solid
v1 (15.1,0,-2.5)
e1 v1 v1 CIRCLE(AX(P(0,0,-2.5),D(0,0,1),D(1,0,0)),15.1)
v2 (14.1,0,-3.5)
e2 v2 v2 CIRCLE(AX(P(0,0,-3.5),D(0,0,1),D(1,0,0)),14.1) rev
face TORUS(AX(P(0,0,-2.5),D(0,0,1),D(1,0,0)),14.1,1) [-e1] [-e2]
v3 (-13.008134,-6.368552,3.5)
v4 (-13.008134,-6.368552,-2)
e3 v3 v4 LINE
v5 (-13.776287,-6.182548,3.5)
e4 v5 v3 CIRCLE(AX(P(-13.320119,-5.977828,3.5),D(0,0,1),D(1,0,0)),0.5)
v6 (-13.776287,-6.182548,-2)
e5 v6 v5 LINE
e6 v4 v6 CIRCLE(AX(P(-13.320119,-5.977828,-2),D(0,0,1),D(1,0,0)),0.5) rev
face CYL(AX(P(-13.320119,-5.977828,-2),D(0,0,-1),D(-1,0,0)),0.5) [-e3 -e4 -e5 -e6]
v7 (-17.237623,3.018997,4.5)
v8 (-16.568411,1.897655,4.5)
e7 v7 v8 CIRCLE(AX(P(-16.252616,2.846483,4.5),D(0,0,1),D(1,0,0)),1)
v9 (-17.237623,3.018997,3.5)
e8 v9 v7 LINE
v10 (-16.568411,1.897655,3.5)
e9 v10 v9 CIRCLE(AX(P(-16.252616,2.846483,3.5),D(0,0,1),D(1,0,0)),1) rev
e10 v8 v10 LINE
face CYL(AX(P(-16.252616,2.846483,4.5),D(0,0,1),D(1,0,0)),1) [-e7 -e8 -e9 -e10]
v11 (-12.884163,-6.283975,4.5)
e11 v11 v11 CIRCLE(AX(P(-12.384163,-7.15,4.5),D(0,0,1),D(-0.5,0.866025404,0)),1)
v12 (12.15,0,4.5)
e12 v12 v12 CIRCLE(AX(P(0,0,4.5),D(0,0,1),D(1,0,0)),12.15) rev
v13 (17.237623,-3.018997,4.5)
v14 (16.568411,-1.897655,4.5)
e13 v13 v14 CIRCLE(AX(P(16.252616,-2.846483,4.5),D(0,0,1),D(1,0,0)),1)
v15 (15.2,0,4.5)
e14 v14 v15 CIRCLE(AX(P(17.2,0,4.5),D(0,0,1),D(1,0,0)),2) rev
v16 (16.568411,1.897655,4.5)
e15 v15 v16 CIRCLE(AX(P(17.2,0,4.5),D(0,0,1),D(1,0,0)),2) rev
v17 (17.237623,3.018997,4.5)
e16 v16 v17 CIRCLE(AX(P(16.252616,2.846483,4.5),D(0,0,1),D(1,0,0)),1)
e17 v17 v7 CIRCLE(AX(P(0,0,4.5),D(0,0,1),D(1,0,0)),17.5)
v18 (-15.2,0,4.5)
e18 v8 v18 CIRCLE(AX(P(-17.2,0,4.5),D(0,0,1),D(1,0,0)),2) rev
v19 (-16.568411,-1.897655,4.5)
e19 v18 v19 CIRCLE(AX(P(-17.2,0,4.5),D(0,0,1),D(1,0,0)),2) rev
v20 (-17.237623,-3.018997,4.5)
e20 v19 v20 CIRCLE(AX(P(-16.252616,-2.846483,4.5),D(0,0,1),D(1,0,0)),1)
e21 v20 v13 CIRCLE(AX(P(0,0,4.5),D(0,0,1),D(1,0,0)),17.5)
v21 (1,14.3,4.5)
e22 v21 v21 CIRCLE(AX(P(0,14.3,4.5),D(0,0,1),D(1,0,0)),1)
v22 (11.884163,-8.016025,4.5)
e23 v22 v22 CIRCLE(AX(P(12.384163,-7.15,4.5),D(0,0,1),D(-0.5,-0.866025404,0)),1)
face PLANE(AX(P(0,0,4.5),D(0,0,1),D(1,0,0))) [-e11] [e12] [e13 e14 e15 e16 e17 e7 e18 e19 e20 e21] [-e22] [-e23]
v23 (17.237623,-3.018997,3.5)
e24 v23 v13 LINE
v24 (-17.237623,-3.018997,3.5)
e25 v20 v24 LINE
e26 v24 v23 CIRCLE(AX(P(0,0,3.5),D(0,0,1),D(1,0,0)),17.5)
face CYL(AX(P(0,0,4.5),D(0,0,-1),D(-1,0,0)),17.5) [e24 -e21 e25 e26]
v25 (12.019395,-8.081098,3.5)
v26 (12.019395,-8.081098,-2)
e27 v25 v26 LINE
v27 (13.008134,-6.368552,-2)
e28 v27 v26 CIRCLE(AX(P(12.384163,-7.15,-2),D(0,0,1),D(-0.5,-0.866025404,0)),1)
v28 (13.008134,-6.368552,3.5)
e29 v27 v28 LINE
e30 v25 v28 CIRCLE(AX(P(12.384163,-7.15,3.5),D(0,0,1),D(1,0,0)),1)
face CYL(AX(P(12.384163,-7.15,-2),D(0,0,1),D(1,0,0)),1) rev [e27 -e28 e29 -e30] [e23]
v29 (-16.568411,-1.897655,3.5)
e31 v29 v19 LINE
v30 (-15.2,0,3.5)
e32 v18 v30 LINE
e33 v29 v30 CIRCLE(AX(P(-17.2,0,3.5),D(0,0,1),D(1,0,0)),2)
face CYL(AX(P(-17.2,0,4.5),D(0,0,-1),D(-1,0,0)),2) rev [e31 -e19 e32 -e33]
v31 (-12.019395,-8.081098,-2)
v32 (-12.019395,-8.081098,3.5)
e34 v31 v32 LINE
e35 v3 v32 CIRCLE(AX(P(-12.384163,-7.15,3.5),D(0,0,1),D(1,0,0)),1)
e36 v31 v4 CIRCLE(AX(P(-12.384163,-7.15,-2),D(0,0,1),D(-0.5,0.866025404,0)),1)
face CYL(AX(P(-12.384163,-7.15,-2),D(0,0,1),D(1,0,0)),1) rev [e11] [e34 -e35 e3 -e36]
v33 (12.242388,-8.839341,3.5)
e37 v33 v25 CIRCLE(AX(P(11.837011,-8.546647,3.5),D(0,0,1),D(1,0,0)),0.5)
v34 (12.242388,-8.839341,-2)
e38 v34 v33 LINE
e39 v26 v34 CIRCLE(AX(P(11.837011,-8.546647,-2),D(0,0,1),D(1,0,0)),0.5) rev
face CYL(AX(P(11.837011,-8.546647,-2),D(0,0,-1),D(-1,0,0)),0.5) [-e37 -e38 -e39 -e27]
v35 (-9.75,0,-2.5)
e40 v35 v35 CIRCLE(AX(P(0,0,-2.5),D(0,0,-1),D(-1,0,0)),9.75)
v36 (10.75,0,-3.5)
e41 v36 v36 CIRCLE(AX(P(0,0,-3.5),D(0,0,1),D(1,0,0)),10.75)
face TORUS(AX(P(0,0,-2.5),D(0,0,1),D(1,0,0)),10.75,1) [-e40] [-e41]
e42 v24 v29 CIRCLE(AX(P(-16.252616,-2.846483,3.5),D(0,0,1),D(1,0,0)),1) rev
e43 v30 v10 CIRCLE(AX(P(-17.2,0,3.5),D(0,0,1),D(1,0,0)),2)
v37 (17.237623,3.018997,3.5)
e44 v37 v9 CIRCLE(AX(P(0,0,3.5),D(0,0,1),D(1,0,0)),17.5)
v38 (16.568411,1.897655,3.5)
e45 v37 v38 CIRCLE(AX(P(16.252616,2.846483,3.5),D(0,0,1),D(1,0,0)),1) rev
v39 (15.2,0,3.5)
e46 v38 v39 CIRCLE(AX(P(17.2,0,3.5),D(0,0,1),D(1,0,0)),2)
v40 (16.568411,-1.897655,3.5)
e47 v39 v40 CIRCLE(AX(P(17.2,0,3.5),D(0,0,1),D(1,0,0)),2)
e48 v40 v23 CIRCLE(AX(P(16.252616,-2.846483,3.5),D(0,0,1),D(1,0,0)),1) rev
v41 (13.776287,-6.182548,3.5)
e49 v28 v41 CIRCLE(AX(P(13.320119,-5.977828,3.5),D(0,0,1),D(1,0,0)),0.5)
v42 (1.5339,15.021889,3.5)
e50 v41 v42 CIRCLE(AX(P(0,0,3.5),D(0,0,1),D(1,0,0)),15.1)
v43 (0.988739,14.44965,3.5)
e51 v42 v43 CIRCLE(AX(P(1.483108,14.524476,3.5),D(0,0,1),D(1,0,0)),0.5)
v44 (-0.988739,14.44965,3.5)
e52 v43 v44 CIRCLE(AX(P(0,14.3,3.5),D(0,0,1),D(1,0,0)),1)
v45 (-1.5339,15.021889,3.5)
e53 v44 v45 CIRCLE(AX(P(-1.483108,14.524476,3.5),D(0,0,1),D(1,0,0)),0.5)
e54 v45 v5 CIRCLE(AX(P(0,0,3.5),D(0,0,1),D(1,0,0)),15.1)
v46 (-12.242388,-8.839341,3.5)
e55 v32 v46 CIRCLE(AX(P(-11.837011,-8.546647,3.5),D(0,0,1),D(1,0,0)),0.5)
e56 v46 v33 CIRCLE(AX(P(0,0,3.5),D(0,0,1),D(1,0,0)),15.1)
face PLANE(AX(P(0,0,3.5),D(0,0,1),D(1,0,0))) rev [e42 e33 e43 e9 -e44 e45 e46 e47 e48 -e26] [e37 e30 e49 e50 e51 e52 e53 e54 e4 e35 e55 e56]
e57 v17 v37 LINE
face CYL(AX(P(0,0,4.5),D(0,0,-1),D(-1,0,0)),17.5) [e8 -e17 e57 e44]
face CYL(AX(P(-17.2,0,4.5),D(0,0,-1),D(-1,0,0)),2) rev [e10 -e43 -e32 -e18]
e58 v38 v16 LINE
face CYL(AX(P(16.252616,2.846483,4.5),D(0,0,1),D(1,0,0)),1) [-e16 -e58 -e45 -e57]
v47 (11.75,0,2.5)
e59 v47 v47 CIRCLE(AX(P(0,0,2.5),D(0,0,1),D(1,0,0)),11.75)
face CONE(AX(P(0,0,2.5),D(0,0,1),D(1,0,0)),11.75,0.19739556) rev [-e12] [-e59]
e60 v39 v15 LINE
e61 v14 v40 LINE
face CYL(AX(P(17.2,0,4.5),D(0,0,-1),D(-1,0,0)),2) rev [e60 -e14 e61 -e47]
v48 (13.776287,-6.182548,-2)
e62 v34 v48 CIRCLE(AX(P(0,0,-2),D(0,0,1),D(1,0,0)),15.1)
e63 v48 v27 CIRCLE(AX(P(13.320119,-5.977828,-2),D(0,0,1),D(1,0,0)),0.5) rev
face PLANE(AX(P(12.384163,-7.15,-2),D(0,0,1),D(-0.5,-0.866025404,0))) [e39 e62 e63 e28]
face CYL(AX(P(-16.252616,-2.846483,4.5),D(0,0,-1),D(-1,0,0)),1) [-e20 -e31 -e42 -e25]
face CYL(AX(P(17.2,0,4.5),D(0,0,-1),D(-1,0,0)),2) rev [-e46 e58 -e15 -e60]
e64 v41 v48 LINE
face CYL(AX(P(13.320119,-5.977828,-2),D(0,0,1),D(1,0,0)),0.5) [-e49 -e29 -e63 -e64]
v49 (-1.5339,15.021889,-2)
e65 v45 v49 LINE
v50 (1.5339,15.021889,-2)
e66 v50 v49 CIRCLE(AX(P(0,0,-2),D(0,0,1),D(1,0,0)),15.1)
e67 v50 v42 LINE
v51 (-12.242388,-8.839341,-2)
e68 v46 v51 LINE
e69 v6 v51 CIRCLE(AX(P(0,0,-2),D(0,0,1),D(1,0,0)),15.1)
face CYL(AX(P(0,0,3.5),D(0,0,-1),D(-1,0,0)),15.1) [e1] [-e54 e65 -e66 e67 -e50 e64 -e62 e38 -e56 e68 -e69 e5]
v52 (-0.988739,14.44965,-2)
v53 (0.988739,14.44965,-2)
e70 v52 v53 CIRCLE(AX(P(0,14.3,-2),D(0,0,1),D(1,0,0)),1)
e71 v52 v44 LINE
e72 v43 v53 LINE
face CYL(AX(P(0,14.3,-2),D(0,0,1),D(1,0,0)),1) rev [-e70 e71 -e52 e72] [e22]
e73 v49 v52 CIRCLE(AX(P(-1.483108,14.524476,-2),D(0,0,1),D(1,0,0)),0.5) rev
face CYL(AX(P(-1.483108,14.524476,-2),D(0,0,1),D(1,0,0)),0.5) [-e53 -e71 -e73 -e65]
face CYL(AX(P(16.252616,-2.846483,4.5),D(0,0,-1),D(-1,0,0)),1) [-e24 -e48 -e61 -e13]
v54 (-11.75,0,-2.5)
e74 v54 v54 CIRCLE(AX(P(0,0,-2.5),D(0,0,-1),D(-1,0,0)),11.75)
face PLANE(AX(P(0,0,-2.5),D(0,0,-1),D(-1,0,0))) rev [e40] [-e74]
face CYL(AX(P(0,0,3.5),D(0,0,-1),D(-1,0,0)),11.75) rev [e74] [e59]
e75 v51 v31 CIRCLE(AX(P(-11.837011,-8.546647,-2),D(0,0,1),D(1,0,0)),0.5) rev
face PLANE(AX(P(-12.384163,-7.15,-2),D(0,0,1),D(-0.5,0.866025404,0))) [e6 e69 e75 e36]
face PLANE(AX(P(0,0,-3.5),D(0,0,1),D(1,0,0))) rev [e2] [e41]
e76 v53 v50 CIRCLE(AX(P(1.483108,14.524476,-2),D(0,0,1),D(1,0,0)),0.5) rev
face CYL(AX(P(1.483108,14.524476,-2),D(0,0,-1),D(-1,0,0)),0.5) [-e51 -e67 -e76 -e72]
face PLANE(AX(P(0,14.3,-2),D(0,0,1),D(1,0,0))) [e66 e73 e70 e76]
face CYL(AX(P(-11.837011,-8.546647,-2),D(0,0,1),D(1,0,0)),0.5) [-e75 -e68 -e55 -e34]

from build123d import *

# Parameters (mm, degrees)
SKETCH_1_R               = 15.1
SKETCH_1_R_2             = 11.750000000000002
EXTRUDE_1_DEPTH          = 3.5
SKETCH_2_R               = 11.750000000000004
SKETCH_2_R_2             = 9.750000000000002
EXTRUDE_2_DEPTH          = 1
FILLET_1_R               = 1
FILLET_2_R               = 1
SKETCH_3_R               = 17.500000000000004
SKETCH_3_R_2             = 11.750000000000002
EXTRUDE_3_DEPTH          = 1
CUT_EXTRUDE_1_DEPTH      = 26.719642299223374
FILLET_3_R               = 2
FILLET_4_R               = 1
SKETCH_6_R               = 1.0000000000000007
CUT_EXTRUDE_2_DEPTH      = 6.5
PATTERN_CIRCULAR_2_COUNT = 3
FILLET_6_R               = 0.5
CHAMFER_1_SIZE           = 0.4
CHAMFER_1_SIZE2          = 2


# Some blends are built 0.0001 mm under size
with BuildPart() as part:
    # 草图1 → 凸台-拉伸1 (new, symmetric)
    with BuildSketch(Plane.XY):
        Circle(SKETCH_1_R)
        Circle(SKETCH_1_R_2, mode=Mode.SUBTRACT)
    extrude(amount=EXTRUDE_1_DEPTH, both=True)

    # 草图2 → 凸台-拉伸2 (add)
    with BuildSketch(Plane(origin=(0, 0, -3.5), x_dir=(-1, 0, 0), z_dir=(0, 0, -1))):
        Circle(SKETCH_2_R)
        Circle(SKETCH_2_R_2, mode=Mode.SUBTRACT)
    extrude(amount=-EXTRUDE_2_DEPTH)

    # 圆角1
    fillet_1_edges = [part.edges().sort_by_distance(p)[0] for p in [
        (-15.1, 1.85e-15, -3.5),
    ]]
    fillet(fillet_1_edges, radius=FILLET_1_R)

    # 圆角2
    fillet_2_edges = [part.edges().sort_by_distance(p)[0] for p in [
        (9.750000000000002, 1.19e-15, -3.5),
    ]]
    fillet(fillet_2_edges, radius=FILLET_2_R - 0.0001)  # a hair under: the kernel refuses the full size

    # 草图3 → 凸台-拉伸3 (add)
    with BuildSketch(Plane.XY.offset(3.5)):
        Circle(SKETCH_3_R)
        with Locations(Location((0, 0, 0), (0, 0, 180))):
            Circle(SKETCH_3_R_2, mode=Mode.SUBTRACT)
    extrude(amount=EXTRUDE_3_DEPTH)

    # 草图4 → 切除-拉伸1 (cut, through all)
    with BuildSketch(Plane(origin=(0, 0, 3.5), x_dir=(-1, 0, 0), z_dir=(0, 0, -1))):
        with BuildLine():
            Line((-20.056660766424834, 2), (-15.06784656146989, 2))
            ThreePointArc((-15.06784656146989, 2), (-15.2, 1.86e-15), (-15.06784656146989, -2))
            Line((-15.06784656146989, -2), (-20.056660766424834, -2))
            Line((-20.056660766424834, -2), (-20.056660766424834, 2))
        make_face()
    cut_extrude_1 = extrude(amount=-CUT_EXTRUDE_1_DEPTH, mode=Mode.SUBTRACT)

    # 镜向1: 切除-拉伸1 across plane
    add(cut_extrude_1.mirror(Plane(origin=(0, 0, 0), x_dir=(0, 0, 1), z_dir=(1, 0, 0))), mode=Mode.SUBTRACT)

    # 圆角3
    fillet_3_edges = [part.edges().sort_by_distance(p)[0] for p in [
        (-15.067846561469892, -2, 4),
        (-15.067846561469892, 2, 4),
        (15.067846561469892, -2, 4),
        (15.067846561469892, 2, 4),
    ]]
    fillet(fillet_3_edges, radius=FILLET_3_R - 0.0001)  # a hair under: the kernel refuses the full size

    # 圆角4
    fillet_4_edges = [part.edges().sort_by_distance(p)[0] for p in [
        (17.385338650713713, 2, 4),
        (17.385338650713713, -2, 4),
        (-17.385338650713713, -2, 4),
        (-17.385338650713713, 2, 4),
    ]]
    fillet(fillet_4_edges, radius=FILLET_4_R)

    # 草图6 → 切除-拉伸2 (cut)
    with BuildSketch(Plane.XY.offset(4.500000000000001)):
        with Locations((7.1e-16, 14.299999999999999)):
            Circle(SKETCH_6_R)
    cut_extrude_2 = extrude(amount=-CUT_EXTRUDE_2_DEPTH, mode=Mode.SUBTRACT)

    # 阵列(圆周)2: 切除-拉伸2 ×3 about axis
    pattern_circular_2_axis = Axis((6.2e-16, -9.3e-16, 0), (0, 0, 1))
    for i in range(1, PATTERN_CIRCULAR_2_COUNT):
        add(cut_extrude_2.rotate(pattern_circular_2_axis, i * 360 / PATTERN_CIRCULAR_2_COUNT), mode=Mode.SUBTRACT)

    # 圆角6
    # the kernel refuses this fillet: 0.5 mm, written as the material it takes off along each edge
    with BuildSketch(Plane(origin=(-0.6164263274586522, 15.087412587412588, -1.9999999999999991), x_dir=(-0.9974594960272485, -0.0712359023601691, 0), z_dir=(0, 0, 1))) as fillet_6_piece_1:
        with BuildLine():
            CenterArc((0.9045816644890499, 0.49976803448578755), FILLET_6_R, 167.30835919933298, 104.43698518013807)
            ThreePointArc((0.41679836041578583, 0.6096199724175768), (0.2667346233621471, 0.2649259303036035), (0, 0))
            ThreePointArc((0, 0), (0.4599051560196865, -0.00700535852919151), (0.9198103120393711, 0))
        make_face()
    extrude(amount=5.499999999999999, mode=Mode.SUBTRACT)
    with BuildSketch(Plane(origin=(0.6164263274586537, 15.087412587412588, -1.9999999999999991), x_dir=(0.9974594960272485, -0.0712359023601691, 0), z_dir=(0, 0, 1))) as fillet_6_piece_2:
        with BuildLine():
            CenterArc((0.90458166448905, -0.49976803448578755), FILLET_6_R, 88.25465562052895, 104.43698518013832)
            ThreePointArc((0.41679836041578633, -0.6096199724175786), (0.266734623362148, -0.26492593030360523), (0, 0))
            ThreePointArc((0, 0), (0.45990515601968684, 0.00700535852919153), (0.9198103120393712, 0))
        make_face()
    extrude(amount=5.499999999999999, mode=Mode.SUBTRACT)
    with BuildSketch(Plane(origin=(13.374295741805769, -7.00986543456549, -1.9999999999999991), x_dir=(0.4370376469082089, 0.8994432139857056, 0), z_dir=(0, 0, 1))) as fillet_6_piece_3:
        with BuildLine():
            CenterArc((0.9045816644889654, 0.4997680344857882), FILLET_6_R, 167.30835919933284, 104.4369851801381)
            ThreePointArc((0.41679836041570123, 0.6096199724175785), (0.2667346233620795, 0.26492593030362477), (0, 0))
            ThreePointArc((0, 0), (0.45990515601963466, -0.00700535852919092), (0.9198103120392858, 0))
        make_face()
    extrude(amount=5.499999999999999, mode=Mode.SUBTRACT)
    with BuildSketch(Plane(origin=(12.757869414347034, -8.077547152847108, -1.9999999999999991), x_dir=(-0.5604218491190406, -0.8282073116255346, 0), z_dir=(0, 0, 1))) as fillet_6_piece_4:
        with BuildLine():
            CenterArc((0.9045816644889654, -0.49976803448578744), FILLET_6_R, 88.25465562052915, 104.43698518013807)
            ThreePointArc((0.4167983604157008, -0.6096199724175783), (0.26673462336207926, -0.264925930303624), (0, 0))
            ThreePointArc((0, 0), (0.4599051560196484, 0.00700535852919206), (0.9198103120392849, 3e-17))
        make_face()
    extrude(amount=5.499999999999999, mode=Mode.SUBTRACT)
    with BuildSketch(Plane(origin=(-12.757869414347084, -8.07754715284703, -1.9999999999999991), x_dir=(0.5604218491190395, -0.8282073116255352, 0), z_dir=(0, 0, 1))) as fillet_6_piece_5:
        with BuildLine():
            CenterArc((0.9045816644890518, 0.4997680344857874), FILLET_6_R, 167.30835919933295, 104.43698518013798)
            ThreePointArc((0.4167983604157886, 0.6096199724175766), (0.26673462336214776, 0.26492593030360556), (0, 0))
            ThreePointArc((0, 0), (0.4599051560196818, -0.00700535852919271), (0.9198103120393719, 3e-17))
        make_face()
    extrude(amount=5.499999999999999, mode=Mode.SUBTRACT)
    with BuildSketch(Plane(origin=(-13.374295741805737, -7.009865434565554, -1.9999999999999991), x_dir=(-0.43703764690820945, 0.8994432139857054, 0), z_dir=(0, 0, 1))) as fillet_6_piece_6:
        with BuildLine():
            CenterArc((0.9045816644890493, -0.4997680344857882), FILLET_6_R, 88.25465562052901, 104.43698518013812)
            ThreePointArc((0.4167983604157851, -0.6096199724175783), (0.2667346233621474, -0.26492593030360473), (0, 0))
            ThreePointArc((0, 0), (0.4599051560196919, 0.00700535852919249), (0.91981031203937, 2e-17))
        make_face()
    extrude(amount=5.499999999999999, mode=Mode.SUBTRACT)

    # 倒角1
    chamfer_1_edges = [part.edges().sort_by_distance(p)[0] for p in [
        (11.750000000000002, -8.1e-15, 4.5),
    ]]
    chamfer_1_side = [part.faces().sort_by_distance(p)[0] for p in [
        (15.179125181594527, 1.457318687256729, 4.5),
    ]]
    chamfer(chamfer_1_edges, length=CHAMFER_1_SIZE, length2=CHAMFER_1_SIZE2, reference=chamfer_1_side[0])


solid = part.part
